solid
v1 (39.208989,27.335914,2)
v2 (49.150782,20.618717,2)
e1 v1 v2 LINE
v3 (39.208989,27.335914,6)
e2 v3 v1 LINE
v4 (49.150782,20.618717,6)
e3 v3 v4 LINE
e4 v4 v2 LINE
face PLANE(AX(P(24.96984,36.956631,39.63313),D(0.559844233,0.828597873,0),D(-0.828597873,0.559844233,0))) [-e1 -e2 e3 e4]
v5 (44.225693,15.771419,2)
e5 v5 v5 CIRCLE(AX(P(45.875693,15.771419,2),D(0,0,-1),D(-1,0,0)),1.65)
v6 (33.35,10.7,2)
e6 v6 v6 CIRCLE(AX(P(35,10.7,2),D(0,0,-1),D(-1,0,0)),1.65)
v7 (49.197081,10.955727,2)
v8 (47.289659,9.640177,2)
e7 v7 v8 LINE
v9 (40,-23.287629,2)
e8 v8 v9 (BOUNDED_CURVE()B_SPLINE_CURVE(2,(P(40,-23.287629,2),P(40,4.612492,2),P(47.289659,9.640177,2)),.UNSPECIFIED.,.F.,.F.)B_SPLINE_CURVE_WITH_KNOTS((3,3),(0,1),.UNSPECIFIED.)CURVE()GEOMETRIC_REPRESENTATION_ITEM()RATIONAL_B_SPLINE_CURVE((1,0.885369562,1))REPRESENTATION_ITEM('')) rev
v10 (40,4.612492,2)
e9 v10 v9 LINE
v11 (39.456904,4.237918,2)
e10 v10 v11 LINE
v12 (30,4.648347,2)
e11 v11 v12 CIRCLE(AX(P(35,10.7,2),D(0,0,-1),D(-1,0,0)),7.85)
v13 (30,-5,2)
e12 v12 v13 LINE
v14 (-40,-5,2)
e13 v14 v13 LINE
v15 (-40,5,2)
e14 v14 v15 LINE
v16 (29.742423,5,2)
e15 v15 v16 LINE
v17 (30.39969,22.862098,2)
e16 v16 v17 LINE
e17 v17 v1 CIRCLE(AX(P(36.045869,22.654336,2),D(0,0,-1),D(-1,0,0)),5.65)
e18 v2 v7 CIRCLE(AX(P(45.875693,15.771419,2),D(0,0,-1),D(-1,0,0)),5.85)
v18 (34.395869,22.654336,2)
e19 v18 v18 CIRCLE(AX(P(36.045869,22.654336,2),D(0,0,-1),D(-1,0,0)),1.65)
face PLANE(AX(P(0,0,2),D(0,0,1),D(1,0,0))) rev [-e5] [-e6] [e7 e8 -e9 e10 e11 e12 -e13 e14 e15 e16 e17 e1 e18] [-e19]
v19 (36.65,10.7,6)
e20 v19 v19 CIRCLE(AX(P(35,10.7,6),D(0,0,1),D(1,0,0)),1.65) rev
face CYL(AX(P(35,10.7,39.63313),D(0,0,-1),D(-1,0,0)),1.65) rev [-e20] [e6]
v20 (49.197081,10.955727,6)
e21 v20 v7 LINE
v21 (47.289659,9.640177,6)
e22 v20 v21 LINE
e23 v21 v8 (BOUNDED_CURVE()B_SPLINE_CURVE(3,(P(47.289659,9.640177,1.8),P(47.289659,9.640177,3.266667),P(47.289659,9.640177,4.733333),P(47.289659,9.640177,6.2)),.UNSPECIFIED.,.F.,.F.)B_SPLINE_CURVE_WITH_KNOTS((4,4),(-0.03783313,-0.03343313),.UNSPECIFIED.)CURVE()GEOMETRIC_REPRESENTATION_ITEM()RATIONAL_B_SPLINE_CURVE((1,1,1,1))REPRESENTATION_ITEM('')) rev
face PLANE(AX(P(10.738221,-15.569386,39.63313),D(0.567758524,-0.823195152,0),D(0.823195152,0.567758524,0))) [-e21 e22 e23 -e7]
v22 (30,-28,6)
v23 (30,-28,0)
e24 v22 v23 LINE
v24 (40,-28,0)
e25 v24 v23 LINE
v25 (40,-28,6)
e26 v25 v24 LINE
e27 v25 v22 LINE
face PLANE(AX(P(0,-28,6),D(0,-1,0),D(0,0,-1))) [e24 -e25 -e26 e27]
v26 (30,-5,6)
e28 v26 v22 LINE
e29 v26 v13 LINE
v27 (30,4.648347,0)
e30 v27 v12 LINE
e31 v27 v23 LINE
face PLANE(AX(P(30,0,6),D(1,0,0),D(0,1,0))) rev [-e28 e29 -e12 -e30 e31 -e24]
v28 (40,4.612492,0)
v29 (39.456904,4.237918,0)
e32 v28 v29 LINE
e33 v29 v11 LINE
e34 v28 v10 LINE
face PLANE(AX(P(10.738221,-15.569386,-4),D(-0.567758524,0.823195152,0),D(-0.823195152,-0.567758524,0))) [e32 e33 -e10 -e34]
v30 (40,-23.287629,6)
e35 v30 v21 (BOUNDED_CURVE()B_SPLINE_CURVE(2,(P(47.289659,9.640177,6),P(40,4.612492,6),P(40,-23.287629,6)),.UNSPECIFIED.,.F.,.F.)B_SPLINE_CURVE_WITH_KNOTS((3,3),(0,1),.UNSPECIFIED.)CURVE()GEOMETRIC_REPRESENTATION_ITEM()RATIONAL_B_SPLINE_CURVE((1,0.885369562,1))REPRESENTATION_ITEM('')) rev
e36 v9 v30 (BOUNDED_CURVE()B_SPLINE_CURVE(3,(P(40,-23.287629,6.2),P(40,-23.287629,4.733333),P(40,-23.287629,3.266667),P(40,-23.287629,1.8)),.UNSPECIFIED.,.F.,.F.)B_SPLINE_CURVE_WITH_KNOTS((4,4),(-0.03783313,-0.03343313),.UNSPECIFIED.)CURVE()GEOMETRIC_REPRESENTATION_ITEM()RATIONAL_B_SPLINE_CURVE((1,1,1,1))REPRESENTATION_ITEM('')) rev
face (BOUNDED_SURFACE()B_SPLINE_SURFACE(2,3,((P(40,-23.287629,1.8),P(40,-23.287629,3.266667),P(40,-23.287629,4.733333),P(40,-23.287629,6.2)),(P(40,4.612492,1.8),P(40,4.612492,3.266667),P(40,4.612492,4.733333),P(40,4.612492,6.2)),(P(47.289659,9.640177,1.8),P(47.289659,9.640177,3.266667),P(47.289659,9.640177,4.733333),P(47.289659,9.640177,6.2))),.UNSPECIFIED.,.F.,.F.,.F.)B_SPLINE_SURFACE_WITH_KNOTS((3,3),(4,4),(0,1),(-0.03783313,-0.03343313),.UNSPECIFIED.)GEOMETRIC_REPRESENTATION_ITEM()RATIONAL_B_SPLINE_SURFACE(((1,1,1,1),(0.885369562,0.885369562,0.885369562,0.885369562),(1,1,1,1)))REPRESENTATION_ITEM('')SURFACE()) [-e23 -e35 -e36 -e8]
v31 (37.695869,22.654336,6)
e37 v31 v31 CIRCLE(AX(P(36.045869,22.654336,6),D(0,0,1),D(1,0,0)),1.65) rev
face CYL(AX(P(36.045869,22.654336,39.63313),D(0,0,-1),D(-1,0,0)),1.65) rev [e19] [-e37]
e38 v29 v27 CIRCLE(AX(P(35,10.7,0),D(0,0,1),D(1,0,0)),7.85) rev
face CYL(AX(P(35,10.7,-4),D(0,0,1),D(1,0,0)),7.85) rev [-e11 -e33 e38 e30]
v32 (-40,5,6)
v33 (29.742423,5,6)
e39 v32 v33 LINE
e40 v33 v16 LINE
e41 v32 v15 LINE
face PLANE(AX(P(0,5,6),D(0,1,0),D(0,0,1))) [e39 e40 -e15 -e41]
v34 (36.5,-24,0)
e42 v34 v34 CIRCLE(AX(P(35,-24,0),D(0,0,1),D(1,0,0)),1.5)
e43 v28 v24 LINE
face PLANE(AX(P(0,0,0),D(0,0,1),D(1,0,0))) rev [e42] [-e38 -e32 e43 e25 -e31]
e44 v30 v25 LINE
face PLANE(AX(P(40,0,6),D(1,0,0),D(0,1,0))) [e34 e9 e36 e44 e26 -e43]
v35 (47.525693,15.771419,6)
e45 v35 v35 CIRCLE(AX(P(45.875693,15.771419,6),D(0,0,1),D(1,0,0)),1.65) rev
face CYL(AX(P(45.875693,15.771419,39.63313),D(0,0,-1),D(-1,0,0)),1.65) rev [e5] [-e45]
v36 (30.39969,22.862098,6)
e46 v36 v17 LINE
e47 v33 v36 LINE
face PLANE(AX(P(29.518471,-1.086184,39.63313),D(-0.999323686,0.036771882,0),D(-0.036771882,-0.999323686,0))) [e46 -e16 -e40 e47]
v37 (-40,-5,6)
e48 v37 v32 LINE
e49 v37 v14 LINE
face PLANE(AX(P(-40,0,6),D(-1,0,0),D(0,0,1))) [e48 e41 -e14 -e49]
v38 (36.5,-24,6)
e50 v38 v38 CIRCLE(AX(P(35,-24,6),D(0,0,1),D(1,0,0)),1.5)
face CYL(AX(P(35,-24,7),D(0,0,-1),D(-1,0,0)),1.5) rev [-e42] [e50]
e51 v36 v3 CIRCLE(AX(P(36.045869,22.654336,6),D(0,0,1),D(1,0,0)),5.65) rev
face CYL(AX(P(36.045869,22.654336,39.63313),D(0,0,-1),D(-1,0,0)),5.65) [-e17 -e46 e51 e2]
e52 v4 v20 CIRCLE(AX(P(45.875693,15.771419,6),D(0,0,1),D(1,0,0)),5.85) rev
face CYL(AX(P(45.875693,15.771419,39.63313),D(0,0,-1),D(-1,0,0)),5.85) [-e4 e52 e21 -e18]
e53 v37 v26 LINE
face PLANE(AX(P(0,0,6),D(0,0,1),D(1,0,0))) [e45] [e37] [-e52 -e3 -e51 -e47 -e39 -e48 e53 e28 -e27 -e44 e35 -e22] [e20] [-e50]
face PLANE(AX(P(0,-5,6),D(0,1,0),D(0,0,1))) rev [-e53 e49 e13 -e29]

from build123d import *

# Parameters (mm, degrees)
IZIM1_W                     = 80
IZIM1_H                     = 10
IZIM1_W_2                   = 10
IZIM1_H_2                   = 40
Y_KSEKLIK_EKSTR_ZYON1_DEPTH = 6
IZIM1_3_W                   = 70
IZIM1_3_H                   = 10
KES_EKSTR_ZYON1_DEPTH       = 2
IZIM4_R                     = 1.5
IZIM4_R_2                   = 1.65
Y_KSEKLIK_EKSTR_ZYON4_DEPTH = 4
IZIM4_3_R                   = 1.5
IZIM4_3_R_2                 = 1.65
KES_EKSTR_ZYON3_DEPTH       = 5
KES_EKSTR_ZYON5_START       = 6
IZIM4_6_R                   = 1.5
IZIM4_6_R_2                 = 1.65
KES_EKSTR_ZYON5_DEPTH       = 6


with BuildPart() as part:
    # Çizim1 → Yükseklik-Ekstrüzyon1 (new body)
    with BuildSketch(Plane.XY):
        Rectangle(IZIM1_W, IZIM1_H)
        with Locations((35, -8)):
            Rectangle(IZIM1_W_2, IZIM1_H_2)
    extrude(amount=Y_KSEKLIK_EKSTR_ZYON1_DEPTH)

    # Çizim1<3> → Kes-Ekstrüzyon1 (cut)
    with BuildSketch(Plane.XY):
        with Locations((-5, 0)):
            Rectangle(IZIM1_3_W, IZIM1_3_H)
    extrude(amount=KES_EKSTR_ZYON1_DEPTH, mode=Mode.SUBTRACT)

    # Çizim4 → Yükseklik-Ekstrüzyon4 (add)
    # profile 1 of 2: a face of its own
    with BuildSketch(Plane(origin=(0, 0, 2), x_dir=(-1, 0, 0), z_dir=(0, 0, -1))):
        with Locations((-35, -24)):
            Circle(IZIM4_R)
    # profile 2 of 2: a face of its own
    with BuildSketch(Plane(origin=(0, 0, 2), x_dir=(-1, 0, 0), z_dir=(0, 0, -1))):
        with BuildLine():
            Line((-29.73781884, 4.874886315), (-30.399690089, 22.862097513))
            ThreePointArc((-30.399690089, 22.862097513), (-33.487518923, 27.691929585), (-39.208988831, 27.335914357))
            Line((-39.208988831, 27.335914357), (-49.15078221, 20.618716695))
            ThreePointArc((-49.15078221, 20.618716695), (-51.725626297, 15.799448116), (-49.197080807, 10.955727499))
            Line((-49.197080807, 10.955727499), (-39.45690441, 4.237918054))
            ThreePointArc((-39.45690441, 4.237918054), (-34.486628982, 2.866804599), (-29.73781884, 4.874886315))
        make_face()
        with Locations((-36.045868913, 22.654336377)):
            Circle(IZIM4_R_2, mode=Mode.SUBTRACT)
        with Locations((-45.875693444, 15.771419141)):
            Circle(IZIM4_R_2, mode=Mode.SUBTRACT)
        with Locations((-35, 10.7)):
            Circle(IZIM4_R_2, mode=Mode.SUBTRACT)
    extrude(amount=-Y_KSEKLIK_EKSTR_ZYON4_DEPTH)

    # Çizim4<3> → Kes-Ekstrüzyon3 (cut, symmetric)
    with BuildSketch(Plane(origin=(0, 0, 2), x_dir=(-1, 0, 0), z_dir=(0, 0, -1))):
        with Locations(Location((-35, -24, 0), (0, 0, 180))):
            Circle(IZIM4_3_R)
        with Locations((-45.875693444, 15.771419141)):
            Circle(IZIM4_3_R_2)
        with Locations(Location((-35, 10.7, 0), (0, 0, 51.987720456))):
            Circle(IZIM4_3_R_2)
    extrude(amount=KES_EKSTR_ZYON3_DEPTH, both=True, mode=Mode.SUBTRACT)

    # Çizim4<6> → Kes-Ekstrüzyon5 (cut)
    # profile 1 of 2: a face of its own
    with BuildSketch(Plane(origin=(0, 0, 2), x_dir=(-1, 0, 0), z_dir=(0, 0, -1)).offset(KES_EKSTR_ZYON5_START)):
        with Locations(Location((-35, -24, 0), (0, 0, 180))):
            Circle(IZIM4_6_R)
    # profile 2 of 2: a face of its own
    with BuildSketch(Plane(origin=(0, 0, 2), x_dir=(-1, 0, 0), z_dir=(0, 0, -1)).offset(KES_EKSTR_ZYON5_START)):
        with BuildLine():
            Line((-29.73781884, 4.874886315), (-30.399690089, 22.862097513))
            ThreePointArc((-30.399690089, 22.862097513), (-33.487518923, 27.691929585), (-39.208988831, 27.335914357))
            Line((-39.208988831, 27.335914357), (-49.15078221, 20.618716695))
            ThreePointArc((-49.15078221, 20.618716695), (-51.725626297, 15.799448116), (-49.197080807, 10.955727499))
            Line((-49.197080807, 10.955727499), (-39.45690441, 4.237918054))
            ThreePointArc((-39.45690441, 4.237918054), (-34.486628982, 2.866804599), (-29.73781884, 4.874886315))
        make_face()
        with Locations((-36.045868913, 22.654336377)):
            Circle(IZIM4_6_R_2, mode=Mode.SUBTRACT)
        with Locations((-45.875693444, 15.771419141)):
            Circle(IZIM4_6_R_2, mode=Mode.SUBTRACT)
        with Locations((-35, 10.7)):
            Circle(IZIM4_6_R_2, mode=Mode.SUBTRACT)
    extrude(amount=-KES_EKSTR_ZYON5_DEPTH, mode=Mode.SUBTRACT)

    # Radyus2
    # a fillet whose section is not a circle: 40, 30 mm, written as the material it adds along each edge
    with BuildSketch(Plane(origin=(40, 4.612491628, 2), x_dir=(0, -1, 0), z_dir=(0, 0, 1))) as radyus2_piece_1:
        with BuildLine():
            Bezier((27.900120921, 0), (0, 0), (-5.027685175, 7.289659058), weights=[1, 0.885369562, 1])
            Line((-5.027685175, 7.289659058), (0, 0))
            Line((0, 0), (27.900120921, 0))
        make_face()
    extrude(amount=4)


solid = part.part
